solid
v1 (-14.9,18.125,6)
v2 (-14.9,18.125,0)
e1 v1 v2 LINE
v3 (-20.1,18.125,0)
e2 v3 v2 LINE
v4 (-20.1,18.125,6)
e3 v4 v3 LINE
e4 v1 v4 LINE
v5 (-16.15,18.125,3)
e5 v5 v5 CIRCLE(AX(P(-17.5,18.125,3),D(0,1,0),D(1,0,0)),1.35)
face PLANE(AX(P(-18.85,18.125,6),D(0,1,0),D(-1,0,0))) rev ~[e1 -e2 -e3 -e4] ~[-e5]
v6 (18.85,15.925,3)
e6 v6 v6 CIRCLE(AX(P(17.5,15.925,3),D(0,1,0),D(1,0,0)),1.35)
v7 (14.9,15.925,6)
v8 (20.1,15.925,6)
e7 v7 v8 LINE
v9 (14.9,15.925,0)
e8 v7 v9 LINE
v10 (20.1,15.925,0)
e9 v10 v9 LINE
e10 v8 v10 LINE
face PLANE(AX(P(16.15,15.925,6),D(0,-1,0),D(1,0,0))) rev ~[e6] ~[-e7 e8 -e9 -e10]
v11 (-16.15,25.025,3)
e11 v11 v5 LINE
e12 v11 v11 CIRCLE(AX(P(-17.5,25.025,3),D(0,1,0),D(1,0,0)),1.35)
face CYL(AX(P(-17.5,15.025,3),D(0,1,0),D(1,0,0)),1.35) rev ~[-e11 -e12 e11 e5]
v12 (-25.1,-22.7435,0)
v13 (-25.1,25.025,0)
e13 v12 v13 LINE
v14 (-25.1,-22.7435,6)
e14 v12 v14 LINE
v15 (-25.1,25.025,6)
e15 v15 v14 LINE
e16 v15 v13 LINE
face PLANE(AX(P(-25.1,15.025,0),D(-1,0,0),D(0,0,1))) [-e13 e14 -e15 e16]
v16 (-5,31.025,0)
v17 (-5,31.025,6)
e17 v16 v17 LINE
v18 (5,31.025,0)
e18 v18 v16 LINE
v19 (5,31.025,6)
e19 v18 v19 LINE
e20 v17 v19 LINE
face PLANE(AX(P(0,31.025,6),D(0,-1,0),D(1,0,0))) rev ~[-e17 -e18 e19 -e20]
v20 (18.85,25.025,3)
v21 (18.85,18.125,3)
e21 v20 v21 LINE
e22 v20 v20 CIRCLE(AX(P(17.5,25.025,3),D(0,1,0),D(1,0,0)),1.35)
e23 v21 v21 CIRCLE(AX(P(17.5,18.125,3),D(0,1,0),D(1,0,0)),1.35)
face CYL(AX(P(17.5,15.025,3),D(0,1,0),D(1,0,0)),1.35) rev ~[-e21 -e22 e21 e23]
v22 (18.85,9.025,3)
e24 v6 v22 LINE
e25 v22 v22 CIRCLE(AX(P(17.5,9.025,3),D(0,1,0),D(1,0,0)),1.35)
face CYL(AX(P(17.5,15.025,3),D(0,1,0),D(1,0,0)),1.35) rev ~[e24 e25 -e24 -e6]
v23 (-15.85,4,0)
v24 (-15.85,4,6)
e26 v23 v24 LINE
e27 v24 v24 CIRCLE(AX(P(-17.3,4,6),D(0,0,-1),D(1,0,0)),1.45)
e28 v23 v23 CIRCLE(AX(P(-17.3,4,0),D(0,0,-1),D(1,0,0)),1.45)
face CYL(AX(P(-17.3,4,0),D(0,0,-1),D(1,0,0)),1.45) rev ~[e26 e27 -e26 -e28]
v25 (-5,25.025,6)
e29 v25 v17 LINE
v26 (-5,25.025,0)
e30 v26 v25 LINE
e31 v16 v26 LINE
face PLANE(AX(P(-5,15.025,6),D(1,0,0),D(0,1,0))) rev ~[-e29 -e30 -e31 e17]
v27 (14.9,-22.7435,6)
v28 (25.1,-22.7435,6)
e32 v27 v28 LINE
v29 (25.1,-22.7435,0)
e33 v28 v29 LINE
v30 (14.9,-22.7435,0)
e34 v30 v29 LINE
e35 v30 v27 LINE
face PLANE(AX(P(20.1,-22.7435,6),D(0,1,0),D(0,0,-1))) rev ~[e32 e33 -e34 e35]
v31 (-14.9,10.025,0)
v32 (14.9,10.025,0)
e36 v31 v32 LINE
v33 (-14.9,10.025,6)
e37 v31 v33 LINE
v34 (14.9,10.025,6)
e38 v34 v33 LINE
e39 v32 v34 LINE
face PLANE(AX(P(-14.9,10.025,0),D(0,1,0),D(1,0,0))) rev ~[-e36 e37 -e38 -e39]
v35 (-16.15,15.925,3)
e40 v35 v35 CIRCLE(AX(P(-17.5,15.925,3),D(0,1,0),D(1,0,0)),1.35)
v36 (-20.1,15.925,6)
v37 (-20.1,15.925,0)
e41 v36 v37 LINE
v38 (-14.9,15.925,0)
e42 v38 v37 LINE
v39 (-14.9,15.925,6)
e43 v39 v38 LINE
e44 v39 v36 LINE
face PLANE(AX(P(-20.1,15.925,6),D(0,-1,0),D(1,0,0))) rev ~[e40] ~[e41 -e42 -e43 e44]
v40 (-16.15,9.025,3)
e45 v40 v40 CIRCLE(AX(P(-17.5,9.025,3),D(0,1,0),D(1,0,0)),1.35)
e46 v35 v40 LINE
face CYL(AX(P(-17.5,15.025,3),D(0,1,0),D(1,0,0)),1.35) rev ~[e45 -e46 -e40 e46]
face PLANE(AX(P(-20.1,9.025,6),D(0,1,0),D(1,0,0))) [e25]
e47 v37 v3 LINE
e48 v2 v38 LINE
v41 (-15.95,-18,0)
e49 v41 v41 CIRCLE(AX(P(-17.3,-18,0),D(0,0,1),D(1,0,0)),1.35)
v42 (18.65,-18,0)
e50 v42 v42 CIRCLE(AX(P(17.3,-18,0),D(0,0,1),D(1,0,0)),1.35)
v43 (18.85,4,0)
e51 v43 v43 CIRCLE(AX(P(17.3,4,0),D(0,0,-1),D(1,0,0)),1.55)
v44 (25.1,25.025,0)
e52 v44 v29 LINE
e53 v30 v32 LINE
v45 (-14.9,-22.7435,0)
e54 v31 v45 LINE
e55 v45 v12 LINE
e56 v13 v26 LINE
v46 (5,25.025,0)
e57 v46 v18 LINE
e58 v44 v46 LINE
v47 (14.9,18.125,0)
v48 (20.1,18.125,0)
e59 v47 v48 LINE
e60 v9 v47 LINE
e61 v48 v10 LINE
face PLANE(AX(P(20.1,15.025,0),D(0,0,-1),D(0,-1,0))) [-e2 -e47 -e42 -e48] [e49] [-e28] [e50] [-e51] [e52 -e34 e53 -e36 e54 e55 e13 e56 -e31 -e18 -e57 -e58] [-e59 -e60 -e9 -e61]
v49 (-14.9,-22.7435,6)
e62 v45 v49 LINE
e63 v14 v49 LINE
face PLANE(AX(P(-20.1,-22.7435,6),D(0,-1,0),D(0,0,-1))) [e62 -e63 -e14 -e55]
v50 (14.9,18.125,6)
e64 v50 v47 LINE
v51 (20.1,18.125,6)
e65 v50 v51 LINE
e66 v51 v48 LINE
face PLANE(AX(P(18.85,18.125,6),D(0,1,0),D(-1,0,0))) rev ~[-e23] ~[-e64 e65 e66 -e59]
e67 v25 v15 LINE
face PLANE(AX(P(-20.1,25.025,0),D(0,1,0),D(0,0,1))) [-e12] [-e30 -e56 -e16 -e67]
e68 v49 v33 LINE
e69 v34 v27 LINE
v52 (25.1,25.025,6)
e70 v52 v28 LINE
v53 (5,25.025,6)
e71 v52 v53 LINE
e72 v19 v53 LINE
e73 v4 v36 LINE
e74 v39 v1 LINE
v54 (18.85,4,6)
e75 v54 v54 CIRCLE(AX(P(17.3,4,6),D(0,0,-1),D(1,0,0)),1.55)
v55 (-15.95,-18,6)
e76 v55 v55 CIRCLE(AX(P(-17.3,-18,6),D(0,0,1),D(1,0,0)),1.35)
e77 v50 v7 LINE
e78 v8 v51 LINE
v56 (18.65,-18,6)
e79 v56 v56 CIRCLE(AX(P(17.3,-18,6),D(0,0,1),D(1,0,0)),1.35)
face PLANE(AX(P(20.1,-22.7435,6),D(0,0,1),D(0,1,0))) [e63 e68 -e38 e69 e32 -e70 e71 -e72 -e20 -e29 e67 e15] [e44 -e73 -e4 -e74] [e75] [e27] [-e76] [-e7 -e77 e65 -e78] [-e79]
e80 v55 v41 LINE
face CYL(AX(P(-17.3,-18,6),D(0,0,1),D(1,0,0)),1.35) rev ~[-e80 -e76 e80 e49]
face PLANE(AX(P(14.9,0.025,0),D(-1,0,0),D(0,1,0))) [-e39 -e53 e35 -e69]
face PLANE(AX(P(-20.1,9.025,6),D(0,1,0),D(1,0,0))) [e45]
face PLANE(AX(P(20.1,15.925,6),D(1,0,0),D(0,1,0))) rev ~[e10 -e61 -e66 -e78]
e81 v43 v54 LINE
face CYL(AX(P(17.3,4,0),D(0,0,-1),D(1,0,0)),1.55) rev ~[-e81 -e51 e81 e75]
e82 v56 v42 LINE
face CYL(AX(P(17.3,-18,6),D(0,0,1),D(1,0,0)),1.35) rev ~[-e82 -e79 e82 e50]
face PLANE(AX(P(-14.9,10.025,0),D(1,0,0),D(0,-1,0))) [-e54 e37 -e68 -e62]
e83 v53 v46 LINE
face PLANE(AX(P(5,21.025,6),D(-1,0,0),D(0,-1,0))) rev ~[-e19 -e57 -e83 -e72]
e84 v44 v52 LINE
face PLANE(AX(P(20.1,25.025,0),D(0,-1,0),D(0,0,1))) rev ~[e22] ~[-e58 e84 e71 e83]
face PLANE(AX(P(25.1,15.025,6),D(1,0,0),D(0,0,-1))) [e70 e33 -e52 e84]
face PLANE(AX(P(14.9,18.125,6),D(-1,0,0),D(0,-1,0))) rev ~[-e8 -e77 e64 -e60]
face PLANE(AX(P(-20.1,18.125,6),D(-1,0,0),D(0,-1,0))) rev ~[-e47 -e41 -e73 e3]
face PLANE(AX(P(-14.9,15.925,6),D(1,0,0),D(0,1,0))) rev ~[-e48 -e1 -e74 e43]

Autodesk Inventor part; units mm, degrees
ref_plane "YZ Plane" through (0, 0, 0) normal (1, 0, 0) x (0, 1, 0)
ref_plane "XZ Plane" through (0, 0, 0) normal (0, 1, 0) x (-1, 0, 0)
ref_plane "XY Plane" through (0, 0, 0) normal (0, 0, 1) x (1, 0, 0)
ref_plane "작업 평면1" through (0, 0, 0) normal (0, 0, 1) x (1, 0, 0)
sketch "스케치1" plane through (0, 0, 0) normal (0, 0, 1) x (1, 0, 0)
  line L0 (-20.1, 0.025) -> (-14.5, 0.025) projected
  line L1 (-20.1, -44.6) -> (-20.1, 8.5) projected
  line L2 (20.1, 0.025) -> (14.5, 0.025) projected
  line L3 (20.1, 8.5) -> (20.1, -44.6) projected
  circle A0 centre (17.3, 4) radius 1.45 projected
  circle A1 centre (-17.3, 4) radius 1.35 projected
  circle A2 centre (-17.3, 4) radius 1.45
  circle A3 centre (17.3, 4) radius 1.55
  line L4 (14.9, 0.025) -> (14.9, 15.025)
  line L5 (-14.9, 15.025) -> (-14.9, 0.025)
  line L6 (-20.1, 0.025) -> (-20.1, 15.025)
  line L7 (20.1, 0.025) -> (20.1, 15.025)
  line L8 (-20.1, 15.025) -> (20.1, 15.025)
  line L9 (-20.1, 0.025) -> (-14.9, 0.025)
  line L10 (14.9, 0.025) -> (20.1, 0.025)
  line L11 (-14.9, 0.025) -> (-14.9, 10.025)
  line L12 (-14.9, 10.025) -> (14.9, 10.025)
  line L13 (14.9, 0.025) -> (20.1, 0.025)
  point P0 (0, 0)
  point P1 (-20.1, 8.5)
  point P2 (-14.9, 0.025)
  dimension "d0" = 0.1
  dimension "d1" = 0.1
  dimension "d4" = 15
  dimension "d5" = 15
  dimension "d9" = 10
extrude "돌출1" add sketch "스케치1" along normal blind 6 contours L1 L6 L8 L5 L0 | L5 L8 L4 L12 | L4 L8 L7 L3 L2
sketch "스케치5" plane through (0, 0, 6) normal (0, 0, 1) x (1, 0, 0)
  line L0 (15, -50.5) -> (11.5, -50.5)
  line L1 (15, -50.5) -> (20.1, -44.5)
  line L2 (20.1, -44.5) -> (20.1, 8.6)
  line L3 (20.1, 8.6) -> (15, 14.6)
  line L4 (15, 14.6) -> (-15, 14.6)
  line L5 (-15, 14.6) -> (-20.1, 8.6)
  line L6 (-20.1, 8.6) -> (-20.1, -44.5)
  line L7 (-20.1, -44.5) -> (-15, -50.5)
  line L8 (-11.5, -50.5) -> (-15, -50.5)
  arc A0 (-14.5, -47.5) -> (-11.5, -50.5) centre (-11.5, -47.5) ccw
  line L9 (-14.5, 6) -> (-14.5, -47.5)
  arc A1 (-11.5, 9) -> (-14.5, 6) centre (-11.5, 6) ccw
  line L10 (11.5, 9) -> (-11.5, 9)
  arc A2 (14.5, 6) -> (11.5, 9) centre (11.5, 6) ccw
  line L11 (14.5, -47.5) -> (14.5, 6)
  arc A3 (11.5, -50.5) -> (14.5, -47.5) centre (11.5, -47.5) ccw
  circle A4 centre (-17.3, -40) radius 1.35
  circle A5 centre (-17.3, -18) radius 1.35
  circle A6 centre (-17.3, 4) radius 1.35
  circle A7 centre (-11, 11.8) radius 1.35
  circle A8 centre (17.3, -40) radius 1.35
  circle A9 centre (17.3, -18) radius 1.35
  circle A10 centre (17.3, 4) radius 1.35
  circle A11 centre (11, 11.8) radius 1.35
  line L12 (20.1, 15.025) -> (-20.1, 15.025) projected
  line L13 (-20.1, 15.025) -> (-20.1, 0.025) projected
  line L14 (-20.1, 0.025) -> (-14.9, 0.025) projected
  line L15 (-14.9, 0.025) -> (-14.9, 10.025) projected
  line L16 (-14.9, 10.025) -> (14.9, 10.025) projected
  line L17 (14.9, 10.025) -> (14.9, 0.025) projected
  line L18 (14.9, 0.025) -> (20.1, 0.025) projected
  line L19 (20.1, 0.025) -> (20.1, 15.025) projected
  circle A12 centre (17.3, 4) radius 1.55 projected
  circle A13 centre (-17.3, 4) radius 1.45 projected
  line L20 (-14.9, 15.025) -> (-26.9, 15.025)
  line L21 (-26.9, 15.025) -> (-26.9, -22.7435)
  line L22 (-26.9, -22.7435) -> (-14.9, -22.7435)
  line L23 (-14.9, -22.7435) -> (-14.9, 15.025)
  line L24 (14.9, 15.025) -> (26.9, 15.025)
  line L25 (26.9, 15.025) -> (26.9, -22.7435)
  line L26 (26.9, -22.7435) -> (14.9, -22.7435)
  line L27 (14.9, -22.7435) -> (14.9, 15.025)
  point P0 (0, 0)
  point P1 (0, -36)
  point P2 (20.1, 8.6)
  point P3 (20.1, -22.7435)
  point P4 (-20.1, -22.7435)
  point P5 (-20.1, 15.025)
  point P6 (20.1, 0.025)
  point P7 (-14.9, 0.025)
  dimension "d21" = 12
  dimension "d22" = 12
extrude "돌출5" add sketch "스케치5" against normal blind 6 contours L26 L27 L18 L2 | L23 L22 L6 L14
sketch "스케치12" plane through (0, 0, 6) normal (0, 0, 1) x (1, 0, 0)
  circle A0 centre (-17.3, -18) radius 1.35 projected
  circle A1 centre (17.3, -18) radius 1.35 projected
  line L0 (20.1, 15.025) -> (-20.1, 15.025) projected
  line L1 (-20.1, 15.025) -> (-20.1, -22.7435) projected
  line L2 (-20.1, -22.7435) -> (-14.9, -22.7435) projected
  line L3 (-14.9, -22.7435) -> (-14.9, 10.025) projected
  line L4 (-14.9, 10.025) -> (14.9, 10.025) projected
  line L5 (14.9, 10.025) -> (14.9, -22.7435) projected
  line L6 (14.9, -22.7435) -> (20.1, -22.7435) projected
  line L7 (20.1, -22.7435) -> (20.1, 15.025) projected
  circle A2 centre (17.3, 4) radius 1.55 projected
  circle A3 centre (-17.3, 4) radius 1.45 projected
  line L8 (0, 15.025) -> (-5, 15.025)
  line L9 (-5, 15.025) -> (-5, 21.025)
  line L10 (-5, 21.025) -> (0, 21.025)
  line L11 (0, 21.025) -> (0, 15.025)
  line L12 (0, 21.025) -> (5, 21.025)
  line L13 (5, 21.025) -> (5, 15.025)
  line L14 (5, 15.025) -> (0, 15.025)
  line L15 (0, 15.025) -> (0, 21.025)
  point P0 (0, 0)
  point P1 (5, 15.025)
  dimension "d53" = 5
  dimension "d54" = 6
  dimension "d55" = 5
  dimension "d56" = 6
extrude "돌출11" add sketch "스케치12" against normal blind 6 contours L0 L11 L12 L13 | L0 L9 L10 L11
sketch "스케치14" plane through (-20.1, 15.025, 6) normal (0, 1, 0) x (1, 0, 0)
  line L0 (5.2, 6) -> (5.2, 0) projected
  line L1 (15.1, 0) -> (15.1, 6) projected
  line L2 (15.1, 6) -> (0, 6) projected
  line L3 (0, 6) -> (0, 0) projected
  line L4 (15.1, 0) -> (0, 0) projected
  line L5 (25.1, 6) -> (25.1, 0) projected
  line L6 (40.2, 0) -> (25.1, 0) projected
  line L7 (40.2, 6) -> (40.2, 0) projected
  line L8 (40.2, 6) -> (25.1, 6) projected
  line L9 (35, 6) -> (35, 0) projected
  line L10 (0, 6) -> (2.6, 6)
  circle A0 centre (2.6, 3) radius 1.35
  line L11 (40.2, 6) -> (40.2, 0) projected
  line L12 (40.2, 6) -> (37.6, 6)
  circle A1 centre (37.6, 3) radius 1.35
  point P0 (20.1, 6)
  dimension "d59" = 6
  dimension "d60" = 5.2
  dimension "d61" = 2.6
  dimension "d62" = 2.7
  dimension "d63" = 2.6
  dimension "d64" = 2.7
extrude "돌출12" cut sketch "스케치14" against normal blind 6 contours A0 | A1
sketch "스케치16" plane through (-20.1, 15.025, 0) normal (-1, 0, 0) x (0, 0, 1)
  line L0 (0, 0) -> (0, -37.7685) projected
  line L1 (6, -37.7685) -> (0, -37.7685) projected
  line L2 (6, 0) -> (6, -37.7685) projected
  line L3 (0, 0) -> (6, 0) projected
  point P0 (0, -15.025)
extrude "돌출13" add sketch "스케치16" along normal blind 5
sketch "스케치18" plane through (20.1, 15.025, 6) normal (1, 0, 0) x (0, 0, -1)
  line L0 (6, 0) -> (6, -37.7685) projected
  line L1 (6, 0) -> (0, 0) projected
  line L2 (0, -37.7685) -> (0, 0) projected
  line L3 (0, -37.7685) -> (6, -37.7685) projected
  point P0 (6, -15.025)
extrude "돌출14" add sketch "스케치18" along normal blind 5
move faces "이동1" translate (0, 10, 0) faces at (8.7167, 15.025, 3) (1.6667, 21.025, 4) (-8.7167, 15.025, 3)
sketch "스케치19" plane through (0, 0, 6) normal (0, 0, 1) x (1, 0, 0)
  line L0 (-18.85, 9.025) -> (-16.15, 9.025) projected
  circle A0 centre (-17.3, 4) radius 1.45 projected
  line L1 (-14.9, 10.025) -> (14.9, 10.025) projected
  line L2 (-14.9, 10.025) -> (14.9, 10.025) projected
  circle A1 centre (-17.3, -18) radius 1.35 projected
  circle A2 centre (17.3, -18) radius 1.35 projected
  line L3 (5, 25.025) -> (25.1, 25.025) projected
  line L4 (5, 25.025) -> (5, 31.025) projected
  line L5 (5, 31.025) -> (-5, 31.025) projected
  line L6 (-5, 31.025) -> (-5, 25.025) projected
  line L7 (-5, 25.025) -> (-25.1, 25.025) projected
  line L8 (-25.1, -22.7435) -> (-25.1, 25.025) projected
  line L9 (-25.1, -22.7435) -> (-14.9, -22.7435) projected
  line L10 (-14.9, -22.7435) -> (-14.9, 10.025) projected
  line L11 (-14.9, 10.025) -> (14.9, 10.025) projected
  line L12 (14.9, 10.025) -> (14.9, -22.7435) projected
  line L13 (14.9, -22.7435) -> (25.1, -22.7435) projected
  line L14 (25.1, 25.025) -> (25.1, -22.7435) projected
  circle A3 centre (17.3, 4) radius 1.55 projected
  circle A4 centre (-17.3, 4) radius 1.45 projected
  circle A5 centre (-17.3, -18) radius 1.35 projected
  circle A6 centre (17.3, -18) radius 1.35 projected
  line L15 (25.1, 25.025) -> (5, 25.025) projected
  line L16 (25.1, -22.7435) -> (25.1, 25.025) projected
  line L17 (14.9, -22.7435) -> (25.1, -22.7435) projected
  line L18 (14.9, 10.025) -> (14.9, -22.7435) projected
  line L19 (-14.9, 10.025) -> (14.9, 10.025) projected
  line L20 (-14.9, 10.025) -> (-14.9, -22.7435) projected
  line L21 (-14.9, -22.7435) -> (-25.1, -22.7435) projected
  line L22 (-25.1, 25.025) -> (-25.1, -22.7435) projected
  line L23 (-5, 25.025) -> (-25.1, 25.025) projected
  line L24 (-5, 25.025) -> (-5, 31.025) projected
  line L25 (-5, 31.025) -> (5, 31.025) projected
  line L26 (5, 31.025) -> (5, 25.025) projected
  circle A7 centre (17.3, 4) radius 1.55 projected
  circle A8 centre (-17.3, 4) radius 1.45 projected
  line L27 (-5, 25.025) -> (-5, 31.025) projected
  line L28 (-14.9, -22.7435) -> (-14.9, 10.025) projected
  line L29 (-14.9, 10.025) -> (-14.9, -22.7435) projected
  line L30 (-14.9, 10.025) -> (-14.9, -22.7435) projected
  line L31 (-14.9, -22.7435) -> (-14.9, 10.025) projected
  circle A9 centre (-17.3, -18) radius 1.35 projected
  circle A10 centre (-17.3, -18) radius 1.35 projected
  circle A11 centre (-17.3, -18) radius 1.35 projected
  circle A12 centre (-17.3, -18) radius 1.35 projected
  circle A13 centre (-17.3, 4) radius 1.45 projected
  circle A14 centre (-17.3, 4) radius 1.45 projected
  circle A15 centre (-17.3, 4) radius 1.45 projected
  line L32 (-25.1, -22.7435) -> (-14.9, -22.7435) projected
  line L33 (-14.9, -22.7435) -> (-25.1, -22.7435) projected
  line L34 (-25.1, -22.7435) -> (-14.9, -22.7435) projected
  line L35 (-14.9, -22.7435) -> (-25.1, -22.7435) projected
  line L36 (-25.1, -22.7435) -> (-25.1, 25.025) projected
  line L37 (-25.1, 25.025) -> (-25.1, -22.7435) projected
  line L38 (-25.1, 25.025) -> (-25.1, -22.7435) projected
  line L39 (-25.1, -22.7435) -> (-25.1, 25.025) projected
  line L40 (14.9, -22.7435) -> (25.1, -22.7435) projected
  line L41 (14.9, 10.025) -> (14.9, -22.7435) projected
  line L42 (14.9, 10.025) -> (14.9, -22.7435) projected
  circle A16 centre (17.3, -18) radius 1.35 projected
  circle A17 centre (17.3, -18) radius 1.35 projected
  circle A18 centre (17.3, 4) radius 1.55 projected
  circle A19 centre (17.3, 4) radius 1.55 projected
  line L43 (16.15, 9.025) -> (18.85, 9.025) projected
  line L44 (14.9, -22.7435) -> (25.1, -22.7435) projected
  line L45 (25.1, 25.025) -> (25.1, -22.7435) projected
  line L46 (25.1, -22.7435) -> (25.1, 25.025) projected
  line L47 (25.1, -22.7435) -> (25.1, 25.025) projected
  line L48 (25.1, 25.025) -> (25.1, -22.7435) projected
  line L49 (-18.85, 9.025) -> (-16.15, 9.025) projected
  line L50 (-18.85, 25.025) -> (-16.15, 25.025) projected
  line L51 (-18.85, 9.025) -> (-16.15, 9.025) projected
  line L52 (-5, 25.025) -> (-25.1, 25.025) projected
  line L53 (-5, 25.025) -> (-25.1, 25.025) projected
  line L54 (-18.85, 25.025) -> (-16.15, 25.025) projected
  line L55 (-5, 25.025) -> (-25.1, 25.025) projected
  line L56 (-5, 25.025) -> (-25.1, 25.025) projected
  line L57 (-5, 31.025) -> (-5, 25.025) projected
  line L58 (5, 31.025) -> (-5, 31.025) projected
  line L59 (5, 31.025) -> (-5, 31.025) projected
  line L60 (-5, 31.025) -> (5, 31.025) projected
  line L61 (-5, 31.025) -> (-5, 25.025) projected
  line L62 (-5, 25.025) -> (-5, 31.025) projected
  line L63 (-18.85, 25.025) -> (-16.15, 25.025) projected
  line L64 (16.15, 25.025) -> (18.85, 25.025) projected
  line L65 (5, 25.025) -> (25.1, 25.025) projected
  line L66 (25.1, 25.025) -> (5, 25.025) projected
  line L67 (5, 31.025) -> (5, 25.025) projected
  line L68 (5, 25.025) -> (5, 31.025) projected
  line L69 (5, 25.025) -> (5, 31.025) projected
  line L70 (5, 31.025) -> (5, 25.025) projected
  line L71 (-5, 31.025) -> (5, 31.025) projected
  line L72 (14.9, -22.7435) -> (25.1, -22.7435) projected
  line L73 (14.9, -22.7435) -> (25.1, -22.7435) projected
  line L74 (-14.9, 10.025) -> (14.9, 10.025) projected
  line L75 (-14.9, 10.025) -> (14.9, 10.025) projected
  circle A20 centre (17.3, -18) radius 1.35 projected
  circle A21 centre (17.3, -18) radius 1.35 projected
  line L76 (14.9, 10.025) -> (14.9, -22.7435) projected
  line L77 (14.9, 10.025) -> (14.9, -22.7435) projected
  line L78 (16.15, 9.025) -> (18.85, 9.025) projected
  line L79 (16.15, 25.025) -> (18.85, 25.025) projected
  line L80 (16.15, 25.025) -> (18.85, 25.025) projected
  line L81 (5, 25.025) -> (25.1, 25.025) projected
  line L82 (25.1, 25.025) -> (5, 25.025) projected
  circle A22 centre (17.3, 4) radius 1.55 projected
  circle A23 centre (17.3, 4) radius 1.55 projected
  line L83 (16.15, 9.025) -> (18.85, 9.025) projected
  line L84 (-18.85, 25.025) -> (-18.85, 9.025) projected
  line L85 (-16.15, 25.025) -> (-16.15, 9.025) projected
  line L86 (16.15, 25.025) -> (16.15, 9.025) projected
  line L87 (18.85, 25.025) -> (18.85, 9.025) projected
  line L88 (-20.1, 15.925) -> (-14.9, 15.925)
  line L89 (-14.9, 15.925) -> (-14.9, 18.125)
  line L90 (-14.9, 18.125) -> (-20.1, 18.125)
  line L91 (-20.1, 18.125) -> (-20.1, 15.925)
  line L92 (-20.1, 15.925) -> (-14.9, 18.125) construction
  line L93 (-14.9, 15.925) -> (-20.1, 18.125) construction
  line L94 (14.9, 15.925) -> (20.1, 15.925)
  line L95 (20.1, 15.925) -> (20.1, 18.125)
  line L96 (20.1, 18.125) -> (14.9, 18.125)
  line L97 (14.9, 18.125) -> (14.9, 15.925)
  line L98 (14.9, 15.925) -> (20.1, 18.125) construction
  line L99 (20.1, 15.925) -> (14.9, 18.125) construction
  point P0 (0, 0)
  point P1 (-17.5, 17.025)
  point P2 (17.5, 17.025)
  dimension "d74" = 5.2
  dimension "d75" = 2.2
  dimension "d76" = 5.2
  dimension "d77" = 2.2
extrude "돌출15" cut sketch "스케치19" against normal blind 10 contours L88 L91 L90 L84 | L84 L90 L85 L88 | L85 L90 L89 L88 | L96 L87 L94 L86 | L86 L94 L97 L96 | L96 L95 L94 L87
properties part number "frame_knee_to_bridge" material "PMMA 플라스틱"
